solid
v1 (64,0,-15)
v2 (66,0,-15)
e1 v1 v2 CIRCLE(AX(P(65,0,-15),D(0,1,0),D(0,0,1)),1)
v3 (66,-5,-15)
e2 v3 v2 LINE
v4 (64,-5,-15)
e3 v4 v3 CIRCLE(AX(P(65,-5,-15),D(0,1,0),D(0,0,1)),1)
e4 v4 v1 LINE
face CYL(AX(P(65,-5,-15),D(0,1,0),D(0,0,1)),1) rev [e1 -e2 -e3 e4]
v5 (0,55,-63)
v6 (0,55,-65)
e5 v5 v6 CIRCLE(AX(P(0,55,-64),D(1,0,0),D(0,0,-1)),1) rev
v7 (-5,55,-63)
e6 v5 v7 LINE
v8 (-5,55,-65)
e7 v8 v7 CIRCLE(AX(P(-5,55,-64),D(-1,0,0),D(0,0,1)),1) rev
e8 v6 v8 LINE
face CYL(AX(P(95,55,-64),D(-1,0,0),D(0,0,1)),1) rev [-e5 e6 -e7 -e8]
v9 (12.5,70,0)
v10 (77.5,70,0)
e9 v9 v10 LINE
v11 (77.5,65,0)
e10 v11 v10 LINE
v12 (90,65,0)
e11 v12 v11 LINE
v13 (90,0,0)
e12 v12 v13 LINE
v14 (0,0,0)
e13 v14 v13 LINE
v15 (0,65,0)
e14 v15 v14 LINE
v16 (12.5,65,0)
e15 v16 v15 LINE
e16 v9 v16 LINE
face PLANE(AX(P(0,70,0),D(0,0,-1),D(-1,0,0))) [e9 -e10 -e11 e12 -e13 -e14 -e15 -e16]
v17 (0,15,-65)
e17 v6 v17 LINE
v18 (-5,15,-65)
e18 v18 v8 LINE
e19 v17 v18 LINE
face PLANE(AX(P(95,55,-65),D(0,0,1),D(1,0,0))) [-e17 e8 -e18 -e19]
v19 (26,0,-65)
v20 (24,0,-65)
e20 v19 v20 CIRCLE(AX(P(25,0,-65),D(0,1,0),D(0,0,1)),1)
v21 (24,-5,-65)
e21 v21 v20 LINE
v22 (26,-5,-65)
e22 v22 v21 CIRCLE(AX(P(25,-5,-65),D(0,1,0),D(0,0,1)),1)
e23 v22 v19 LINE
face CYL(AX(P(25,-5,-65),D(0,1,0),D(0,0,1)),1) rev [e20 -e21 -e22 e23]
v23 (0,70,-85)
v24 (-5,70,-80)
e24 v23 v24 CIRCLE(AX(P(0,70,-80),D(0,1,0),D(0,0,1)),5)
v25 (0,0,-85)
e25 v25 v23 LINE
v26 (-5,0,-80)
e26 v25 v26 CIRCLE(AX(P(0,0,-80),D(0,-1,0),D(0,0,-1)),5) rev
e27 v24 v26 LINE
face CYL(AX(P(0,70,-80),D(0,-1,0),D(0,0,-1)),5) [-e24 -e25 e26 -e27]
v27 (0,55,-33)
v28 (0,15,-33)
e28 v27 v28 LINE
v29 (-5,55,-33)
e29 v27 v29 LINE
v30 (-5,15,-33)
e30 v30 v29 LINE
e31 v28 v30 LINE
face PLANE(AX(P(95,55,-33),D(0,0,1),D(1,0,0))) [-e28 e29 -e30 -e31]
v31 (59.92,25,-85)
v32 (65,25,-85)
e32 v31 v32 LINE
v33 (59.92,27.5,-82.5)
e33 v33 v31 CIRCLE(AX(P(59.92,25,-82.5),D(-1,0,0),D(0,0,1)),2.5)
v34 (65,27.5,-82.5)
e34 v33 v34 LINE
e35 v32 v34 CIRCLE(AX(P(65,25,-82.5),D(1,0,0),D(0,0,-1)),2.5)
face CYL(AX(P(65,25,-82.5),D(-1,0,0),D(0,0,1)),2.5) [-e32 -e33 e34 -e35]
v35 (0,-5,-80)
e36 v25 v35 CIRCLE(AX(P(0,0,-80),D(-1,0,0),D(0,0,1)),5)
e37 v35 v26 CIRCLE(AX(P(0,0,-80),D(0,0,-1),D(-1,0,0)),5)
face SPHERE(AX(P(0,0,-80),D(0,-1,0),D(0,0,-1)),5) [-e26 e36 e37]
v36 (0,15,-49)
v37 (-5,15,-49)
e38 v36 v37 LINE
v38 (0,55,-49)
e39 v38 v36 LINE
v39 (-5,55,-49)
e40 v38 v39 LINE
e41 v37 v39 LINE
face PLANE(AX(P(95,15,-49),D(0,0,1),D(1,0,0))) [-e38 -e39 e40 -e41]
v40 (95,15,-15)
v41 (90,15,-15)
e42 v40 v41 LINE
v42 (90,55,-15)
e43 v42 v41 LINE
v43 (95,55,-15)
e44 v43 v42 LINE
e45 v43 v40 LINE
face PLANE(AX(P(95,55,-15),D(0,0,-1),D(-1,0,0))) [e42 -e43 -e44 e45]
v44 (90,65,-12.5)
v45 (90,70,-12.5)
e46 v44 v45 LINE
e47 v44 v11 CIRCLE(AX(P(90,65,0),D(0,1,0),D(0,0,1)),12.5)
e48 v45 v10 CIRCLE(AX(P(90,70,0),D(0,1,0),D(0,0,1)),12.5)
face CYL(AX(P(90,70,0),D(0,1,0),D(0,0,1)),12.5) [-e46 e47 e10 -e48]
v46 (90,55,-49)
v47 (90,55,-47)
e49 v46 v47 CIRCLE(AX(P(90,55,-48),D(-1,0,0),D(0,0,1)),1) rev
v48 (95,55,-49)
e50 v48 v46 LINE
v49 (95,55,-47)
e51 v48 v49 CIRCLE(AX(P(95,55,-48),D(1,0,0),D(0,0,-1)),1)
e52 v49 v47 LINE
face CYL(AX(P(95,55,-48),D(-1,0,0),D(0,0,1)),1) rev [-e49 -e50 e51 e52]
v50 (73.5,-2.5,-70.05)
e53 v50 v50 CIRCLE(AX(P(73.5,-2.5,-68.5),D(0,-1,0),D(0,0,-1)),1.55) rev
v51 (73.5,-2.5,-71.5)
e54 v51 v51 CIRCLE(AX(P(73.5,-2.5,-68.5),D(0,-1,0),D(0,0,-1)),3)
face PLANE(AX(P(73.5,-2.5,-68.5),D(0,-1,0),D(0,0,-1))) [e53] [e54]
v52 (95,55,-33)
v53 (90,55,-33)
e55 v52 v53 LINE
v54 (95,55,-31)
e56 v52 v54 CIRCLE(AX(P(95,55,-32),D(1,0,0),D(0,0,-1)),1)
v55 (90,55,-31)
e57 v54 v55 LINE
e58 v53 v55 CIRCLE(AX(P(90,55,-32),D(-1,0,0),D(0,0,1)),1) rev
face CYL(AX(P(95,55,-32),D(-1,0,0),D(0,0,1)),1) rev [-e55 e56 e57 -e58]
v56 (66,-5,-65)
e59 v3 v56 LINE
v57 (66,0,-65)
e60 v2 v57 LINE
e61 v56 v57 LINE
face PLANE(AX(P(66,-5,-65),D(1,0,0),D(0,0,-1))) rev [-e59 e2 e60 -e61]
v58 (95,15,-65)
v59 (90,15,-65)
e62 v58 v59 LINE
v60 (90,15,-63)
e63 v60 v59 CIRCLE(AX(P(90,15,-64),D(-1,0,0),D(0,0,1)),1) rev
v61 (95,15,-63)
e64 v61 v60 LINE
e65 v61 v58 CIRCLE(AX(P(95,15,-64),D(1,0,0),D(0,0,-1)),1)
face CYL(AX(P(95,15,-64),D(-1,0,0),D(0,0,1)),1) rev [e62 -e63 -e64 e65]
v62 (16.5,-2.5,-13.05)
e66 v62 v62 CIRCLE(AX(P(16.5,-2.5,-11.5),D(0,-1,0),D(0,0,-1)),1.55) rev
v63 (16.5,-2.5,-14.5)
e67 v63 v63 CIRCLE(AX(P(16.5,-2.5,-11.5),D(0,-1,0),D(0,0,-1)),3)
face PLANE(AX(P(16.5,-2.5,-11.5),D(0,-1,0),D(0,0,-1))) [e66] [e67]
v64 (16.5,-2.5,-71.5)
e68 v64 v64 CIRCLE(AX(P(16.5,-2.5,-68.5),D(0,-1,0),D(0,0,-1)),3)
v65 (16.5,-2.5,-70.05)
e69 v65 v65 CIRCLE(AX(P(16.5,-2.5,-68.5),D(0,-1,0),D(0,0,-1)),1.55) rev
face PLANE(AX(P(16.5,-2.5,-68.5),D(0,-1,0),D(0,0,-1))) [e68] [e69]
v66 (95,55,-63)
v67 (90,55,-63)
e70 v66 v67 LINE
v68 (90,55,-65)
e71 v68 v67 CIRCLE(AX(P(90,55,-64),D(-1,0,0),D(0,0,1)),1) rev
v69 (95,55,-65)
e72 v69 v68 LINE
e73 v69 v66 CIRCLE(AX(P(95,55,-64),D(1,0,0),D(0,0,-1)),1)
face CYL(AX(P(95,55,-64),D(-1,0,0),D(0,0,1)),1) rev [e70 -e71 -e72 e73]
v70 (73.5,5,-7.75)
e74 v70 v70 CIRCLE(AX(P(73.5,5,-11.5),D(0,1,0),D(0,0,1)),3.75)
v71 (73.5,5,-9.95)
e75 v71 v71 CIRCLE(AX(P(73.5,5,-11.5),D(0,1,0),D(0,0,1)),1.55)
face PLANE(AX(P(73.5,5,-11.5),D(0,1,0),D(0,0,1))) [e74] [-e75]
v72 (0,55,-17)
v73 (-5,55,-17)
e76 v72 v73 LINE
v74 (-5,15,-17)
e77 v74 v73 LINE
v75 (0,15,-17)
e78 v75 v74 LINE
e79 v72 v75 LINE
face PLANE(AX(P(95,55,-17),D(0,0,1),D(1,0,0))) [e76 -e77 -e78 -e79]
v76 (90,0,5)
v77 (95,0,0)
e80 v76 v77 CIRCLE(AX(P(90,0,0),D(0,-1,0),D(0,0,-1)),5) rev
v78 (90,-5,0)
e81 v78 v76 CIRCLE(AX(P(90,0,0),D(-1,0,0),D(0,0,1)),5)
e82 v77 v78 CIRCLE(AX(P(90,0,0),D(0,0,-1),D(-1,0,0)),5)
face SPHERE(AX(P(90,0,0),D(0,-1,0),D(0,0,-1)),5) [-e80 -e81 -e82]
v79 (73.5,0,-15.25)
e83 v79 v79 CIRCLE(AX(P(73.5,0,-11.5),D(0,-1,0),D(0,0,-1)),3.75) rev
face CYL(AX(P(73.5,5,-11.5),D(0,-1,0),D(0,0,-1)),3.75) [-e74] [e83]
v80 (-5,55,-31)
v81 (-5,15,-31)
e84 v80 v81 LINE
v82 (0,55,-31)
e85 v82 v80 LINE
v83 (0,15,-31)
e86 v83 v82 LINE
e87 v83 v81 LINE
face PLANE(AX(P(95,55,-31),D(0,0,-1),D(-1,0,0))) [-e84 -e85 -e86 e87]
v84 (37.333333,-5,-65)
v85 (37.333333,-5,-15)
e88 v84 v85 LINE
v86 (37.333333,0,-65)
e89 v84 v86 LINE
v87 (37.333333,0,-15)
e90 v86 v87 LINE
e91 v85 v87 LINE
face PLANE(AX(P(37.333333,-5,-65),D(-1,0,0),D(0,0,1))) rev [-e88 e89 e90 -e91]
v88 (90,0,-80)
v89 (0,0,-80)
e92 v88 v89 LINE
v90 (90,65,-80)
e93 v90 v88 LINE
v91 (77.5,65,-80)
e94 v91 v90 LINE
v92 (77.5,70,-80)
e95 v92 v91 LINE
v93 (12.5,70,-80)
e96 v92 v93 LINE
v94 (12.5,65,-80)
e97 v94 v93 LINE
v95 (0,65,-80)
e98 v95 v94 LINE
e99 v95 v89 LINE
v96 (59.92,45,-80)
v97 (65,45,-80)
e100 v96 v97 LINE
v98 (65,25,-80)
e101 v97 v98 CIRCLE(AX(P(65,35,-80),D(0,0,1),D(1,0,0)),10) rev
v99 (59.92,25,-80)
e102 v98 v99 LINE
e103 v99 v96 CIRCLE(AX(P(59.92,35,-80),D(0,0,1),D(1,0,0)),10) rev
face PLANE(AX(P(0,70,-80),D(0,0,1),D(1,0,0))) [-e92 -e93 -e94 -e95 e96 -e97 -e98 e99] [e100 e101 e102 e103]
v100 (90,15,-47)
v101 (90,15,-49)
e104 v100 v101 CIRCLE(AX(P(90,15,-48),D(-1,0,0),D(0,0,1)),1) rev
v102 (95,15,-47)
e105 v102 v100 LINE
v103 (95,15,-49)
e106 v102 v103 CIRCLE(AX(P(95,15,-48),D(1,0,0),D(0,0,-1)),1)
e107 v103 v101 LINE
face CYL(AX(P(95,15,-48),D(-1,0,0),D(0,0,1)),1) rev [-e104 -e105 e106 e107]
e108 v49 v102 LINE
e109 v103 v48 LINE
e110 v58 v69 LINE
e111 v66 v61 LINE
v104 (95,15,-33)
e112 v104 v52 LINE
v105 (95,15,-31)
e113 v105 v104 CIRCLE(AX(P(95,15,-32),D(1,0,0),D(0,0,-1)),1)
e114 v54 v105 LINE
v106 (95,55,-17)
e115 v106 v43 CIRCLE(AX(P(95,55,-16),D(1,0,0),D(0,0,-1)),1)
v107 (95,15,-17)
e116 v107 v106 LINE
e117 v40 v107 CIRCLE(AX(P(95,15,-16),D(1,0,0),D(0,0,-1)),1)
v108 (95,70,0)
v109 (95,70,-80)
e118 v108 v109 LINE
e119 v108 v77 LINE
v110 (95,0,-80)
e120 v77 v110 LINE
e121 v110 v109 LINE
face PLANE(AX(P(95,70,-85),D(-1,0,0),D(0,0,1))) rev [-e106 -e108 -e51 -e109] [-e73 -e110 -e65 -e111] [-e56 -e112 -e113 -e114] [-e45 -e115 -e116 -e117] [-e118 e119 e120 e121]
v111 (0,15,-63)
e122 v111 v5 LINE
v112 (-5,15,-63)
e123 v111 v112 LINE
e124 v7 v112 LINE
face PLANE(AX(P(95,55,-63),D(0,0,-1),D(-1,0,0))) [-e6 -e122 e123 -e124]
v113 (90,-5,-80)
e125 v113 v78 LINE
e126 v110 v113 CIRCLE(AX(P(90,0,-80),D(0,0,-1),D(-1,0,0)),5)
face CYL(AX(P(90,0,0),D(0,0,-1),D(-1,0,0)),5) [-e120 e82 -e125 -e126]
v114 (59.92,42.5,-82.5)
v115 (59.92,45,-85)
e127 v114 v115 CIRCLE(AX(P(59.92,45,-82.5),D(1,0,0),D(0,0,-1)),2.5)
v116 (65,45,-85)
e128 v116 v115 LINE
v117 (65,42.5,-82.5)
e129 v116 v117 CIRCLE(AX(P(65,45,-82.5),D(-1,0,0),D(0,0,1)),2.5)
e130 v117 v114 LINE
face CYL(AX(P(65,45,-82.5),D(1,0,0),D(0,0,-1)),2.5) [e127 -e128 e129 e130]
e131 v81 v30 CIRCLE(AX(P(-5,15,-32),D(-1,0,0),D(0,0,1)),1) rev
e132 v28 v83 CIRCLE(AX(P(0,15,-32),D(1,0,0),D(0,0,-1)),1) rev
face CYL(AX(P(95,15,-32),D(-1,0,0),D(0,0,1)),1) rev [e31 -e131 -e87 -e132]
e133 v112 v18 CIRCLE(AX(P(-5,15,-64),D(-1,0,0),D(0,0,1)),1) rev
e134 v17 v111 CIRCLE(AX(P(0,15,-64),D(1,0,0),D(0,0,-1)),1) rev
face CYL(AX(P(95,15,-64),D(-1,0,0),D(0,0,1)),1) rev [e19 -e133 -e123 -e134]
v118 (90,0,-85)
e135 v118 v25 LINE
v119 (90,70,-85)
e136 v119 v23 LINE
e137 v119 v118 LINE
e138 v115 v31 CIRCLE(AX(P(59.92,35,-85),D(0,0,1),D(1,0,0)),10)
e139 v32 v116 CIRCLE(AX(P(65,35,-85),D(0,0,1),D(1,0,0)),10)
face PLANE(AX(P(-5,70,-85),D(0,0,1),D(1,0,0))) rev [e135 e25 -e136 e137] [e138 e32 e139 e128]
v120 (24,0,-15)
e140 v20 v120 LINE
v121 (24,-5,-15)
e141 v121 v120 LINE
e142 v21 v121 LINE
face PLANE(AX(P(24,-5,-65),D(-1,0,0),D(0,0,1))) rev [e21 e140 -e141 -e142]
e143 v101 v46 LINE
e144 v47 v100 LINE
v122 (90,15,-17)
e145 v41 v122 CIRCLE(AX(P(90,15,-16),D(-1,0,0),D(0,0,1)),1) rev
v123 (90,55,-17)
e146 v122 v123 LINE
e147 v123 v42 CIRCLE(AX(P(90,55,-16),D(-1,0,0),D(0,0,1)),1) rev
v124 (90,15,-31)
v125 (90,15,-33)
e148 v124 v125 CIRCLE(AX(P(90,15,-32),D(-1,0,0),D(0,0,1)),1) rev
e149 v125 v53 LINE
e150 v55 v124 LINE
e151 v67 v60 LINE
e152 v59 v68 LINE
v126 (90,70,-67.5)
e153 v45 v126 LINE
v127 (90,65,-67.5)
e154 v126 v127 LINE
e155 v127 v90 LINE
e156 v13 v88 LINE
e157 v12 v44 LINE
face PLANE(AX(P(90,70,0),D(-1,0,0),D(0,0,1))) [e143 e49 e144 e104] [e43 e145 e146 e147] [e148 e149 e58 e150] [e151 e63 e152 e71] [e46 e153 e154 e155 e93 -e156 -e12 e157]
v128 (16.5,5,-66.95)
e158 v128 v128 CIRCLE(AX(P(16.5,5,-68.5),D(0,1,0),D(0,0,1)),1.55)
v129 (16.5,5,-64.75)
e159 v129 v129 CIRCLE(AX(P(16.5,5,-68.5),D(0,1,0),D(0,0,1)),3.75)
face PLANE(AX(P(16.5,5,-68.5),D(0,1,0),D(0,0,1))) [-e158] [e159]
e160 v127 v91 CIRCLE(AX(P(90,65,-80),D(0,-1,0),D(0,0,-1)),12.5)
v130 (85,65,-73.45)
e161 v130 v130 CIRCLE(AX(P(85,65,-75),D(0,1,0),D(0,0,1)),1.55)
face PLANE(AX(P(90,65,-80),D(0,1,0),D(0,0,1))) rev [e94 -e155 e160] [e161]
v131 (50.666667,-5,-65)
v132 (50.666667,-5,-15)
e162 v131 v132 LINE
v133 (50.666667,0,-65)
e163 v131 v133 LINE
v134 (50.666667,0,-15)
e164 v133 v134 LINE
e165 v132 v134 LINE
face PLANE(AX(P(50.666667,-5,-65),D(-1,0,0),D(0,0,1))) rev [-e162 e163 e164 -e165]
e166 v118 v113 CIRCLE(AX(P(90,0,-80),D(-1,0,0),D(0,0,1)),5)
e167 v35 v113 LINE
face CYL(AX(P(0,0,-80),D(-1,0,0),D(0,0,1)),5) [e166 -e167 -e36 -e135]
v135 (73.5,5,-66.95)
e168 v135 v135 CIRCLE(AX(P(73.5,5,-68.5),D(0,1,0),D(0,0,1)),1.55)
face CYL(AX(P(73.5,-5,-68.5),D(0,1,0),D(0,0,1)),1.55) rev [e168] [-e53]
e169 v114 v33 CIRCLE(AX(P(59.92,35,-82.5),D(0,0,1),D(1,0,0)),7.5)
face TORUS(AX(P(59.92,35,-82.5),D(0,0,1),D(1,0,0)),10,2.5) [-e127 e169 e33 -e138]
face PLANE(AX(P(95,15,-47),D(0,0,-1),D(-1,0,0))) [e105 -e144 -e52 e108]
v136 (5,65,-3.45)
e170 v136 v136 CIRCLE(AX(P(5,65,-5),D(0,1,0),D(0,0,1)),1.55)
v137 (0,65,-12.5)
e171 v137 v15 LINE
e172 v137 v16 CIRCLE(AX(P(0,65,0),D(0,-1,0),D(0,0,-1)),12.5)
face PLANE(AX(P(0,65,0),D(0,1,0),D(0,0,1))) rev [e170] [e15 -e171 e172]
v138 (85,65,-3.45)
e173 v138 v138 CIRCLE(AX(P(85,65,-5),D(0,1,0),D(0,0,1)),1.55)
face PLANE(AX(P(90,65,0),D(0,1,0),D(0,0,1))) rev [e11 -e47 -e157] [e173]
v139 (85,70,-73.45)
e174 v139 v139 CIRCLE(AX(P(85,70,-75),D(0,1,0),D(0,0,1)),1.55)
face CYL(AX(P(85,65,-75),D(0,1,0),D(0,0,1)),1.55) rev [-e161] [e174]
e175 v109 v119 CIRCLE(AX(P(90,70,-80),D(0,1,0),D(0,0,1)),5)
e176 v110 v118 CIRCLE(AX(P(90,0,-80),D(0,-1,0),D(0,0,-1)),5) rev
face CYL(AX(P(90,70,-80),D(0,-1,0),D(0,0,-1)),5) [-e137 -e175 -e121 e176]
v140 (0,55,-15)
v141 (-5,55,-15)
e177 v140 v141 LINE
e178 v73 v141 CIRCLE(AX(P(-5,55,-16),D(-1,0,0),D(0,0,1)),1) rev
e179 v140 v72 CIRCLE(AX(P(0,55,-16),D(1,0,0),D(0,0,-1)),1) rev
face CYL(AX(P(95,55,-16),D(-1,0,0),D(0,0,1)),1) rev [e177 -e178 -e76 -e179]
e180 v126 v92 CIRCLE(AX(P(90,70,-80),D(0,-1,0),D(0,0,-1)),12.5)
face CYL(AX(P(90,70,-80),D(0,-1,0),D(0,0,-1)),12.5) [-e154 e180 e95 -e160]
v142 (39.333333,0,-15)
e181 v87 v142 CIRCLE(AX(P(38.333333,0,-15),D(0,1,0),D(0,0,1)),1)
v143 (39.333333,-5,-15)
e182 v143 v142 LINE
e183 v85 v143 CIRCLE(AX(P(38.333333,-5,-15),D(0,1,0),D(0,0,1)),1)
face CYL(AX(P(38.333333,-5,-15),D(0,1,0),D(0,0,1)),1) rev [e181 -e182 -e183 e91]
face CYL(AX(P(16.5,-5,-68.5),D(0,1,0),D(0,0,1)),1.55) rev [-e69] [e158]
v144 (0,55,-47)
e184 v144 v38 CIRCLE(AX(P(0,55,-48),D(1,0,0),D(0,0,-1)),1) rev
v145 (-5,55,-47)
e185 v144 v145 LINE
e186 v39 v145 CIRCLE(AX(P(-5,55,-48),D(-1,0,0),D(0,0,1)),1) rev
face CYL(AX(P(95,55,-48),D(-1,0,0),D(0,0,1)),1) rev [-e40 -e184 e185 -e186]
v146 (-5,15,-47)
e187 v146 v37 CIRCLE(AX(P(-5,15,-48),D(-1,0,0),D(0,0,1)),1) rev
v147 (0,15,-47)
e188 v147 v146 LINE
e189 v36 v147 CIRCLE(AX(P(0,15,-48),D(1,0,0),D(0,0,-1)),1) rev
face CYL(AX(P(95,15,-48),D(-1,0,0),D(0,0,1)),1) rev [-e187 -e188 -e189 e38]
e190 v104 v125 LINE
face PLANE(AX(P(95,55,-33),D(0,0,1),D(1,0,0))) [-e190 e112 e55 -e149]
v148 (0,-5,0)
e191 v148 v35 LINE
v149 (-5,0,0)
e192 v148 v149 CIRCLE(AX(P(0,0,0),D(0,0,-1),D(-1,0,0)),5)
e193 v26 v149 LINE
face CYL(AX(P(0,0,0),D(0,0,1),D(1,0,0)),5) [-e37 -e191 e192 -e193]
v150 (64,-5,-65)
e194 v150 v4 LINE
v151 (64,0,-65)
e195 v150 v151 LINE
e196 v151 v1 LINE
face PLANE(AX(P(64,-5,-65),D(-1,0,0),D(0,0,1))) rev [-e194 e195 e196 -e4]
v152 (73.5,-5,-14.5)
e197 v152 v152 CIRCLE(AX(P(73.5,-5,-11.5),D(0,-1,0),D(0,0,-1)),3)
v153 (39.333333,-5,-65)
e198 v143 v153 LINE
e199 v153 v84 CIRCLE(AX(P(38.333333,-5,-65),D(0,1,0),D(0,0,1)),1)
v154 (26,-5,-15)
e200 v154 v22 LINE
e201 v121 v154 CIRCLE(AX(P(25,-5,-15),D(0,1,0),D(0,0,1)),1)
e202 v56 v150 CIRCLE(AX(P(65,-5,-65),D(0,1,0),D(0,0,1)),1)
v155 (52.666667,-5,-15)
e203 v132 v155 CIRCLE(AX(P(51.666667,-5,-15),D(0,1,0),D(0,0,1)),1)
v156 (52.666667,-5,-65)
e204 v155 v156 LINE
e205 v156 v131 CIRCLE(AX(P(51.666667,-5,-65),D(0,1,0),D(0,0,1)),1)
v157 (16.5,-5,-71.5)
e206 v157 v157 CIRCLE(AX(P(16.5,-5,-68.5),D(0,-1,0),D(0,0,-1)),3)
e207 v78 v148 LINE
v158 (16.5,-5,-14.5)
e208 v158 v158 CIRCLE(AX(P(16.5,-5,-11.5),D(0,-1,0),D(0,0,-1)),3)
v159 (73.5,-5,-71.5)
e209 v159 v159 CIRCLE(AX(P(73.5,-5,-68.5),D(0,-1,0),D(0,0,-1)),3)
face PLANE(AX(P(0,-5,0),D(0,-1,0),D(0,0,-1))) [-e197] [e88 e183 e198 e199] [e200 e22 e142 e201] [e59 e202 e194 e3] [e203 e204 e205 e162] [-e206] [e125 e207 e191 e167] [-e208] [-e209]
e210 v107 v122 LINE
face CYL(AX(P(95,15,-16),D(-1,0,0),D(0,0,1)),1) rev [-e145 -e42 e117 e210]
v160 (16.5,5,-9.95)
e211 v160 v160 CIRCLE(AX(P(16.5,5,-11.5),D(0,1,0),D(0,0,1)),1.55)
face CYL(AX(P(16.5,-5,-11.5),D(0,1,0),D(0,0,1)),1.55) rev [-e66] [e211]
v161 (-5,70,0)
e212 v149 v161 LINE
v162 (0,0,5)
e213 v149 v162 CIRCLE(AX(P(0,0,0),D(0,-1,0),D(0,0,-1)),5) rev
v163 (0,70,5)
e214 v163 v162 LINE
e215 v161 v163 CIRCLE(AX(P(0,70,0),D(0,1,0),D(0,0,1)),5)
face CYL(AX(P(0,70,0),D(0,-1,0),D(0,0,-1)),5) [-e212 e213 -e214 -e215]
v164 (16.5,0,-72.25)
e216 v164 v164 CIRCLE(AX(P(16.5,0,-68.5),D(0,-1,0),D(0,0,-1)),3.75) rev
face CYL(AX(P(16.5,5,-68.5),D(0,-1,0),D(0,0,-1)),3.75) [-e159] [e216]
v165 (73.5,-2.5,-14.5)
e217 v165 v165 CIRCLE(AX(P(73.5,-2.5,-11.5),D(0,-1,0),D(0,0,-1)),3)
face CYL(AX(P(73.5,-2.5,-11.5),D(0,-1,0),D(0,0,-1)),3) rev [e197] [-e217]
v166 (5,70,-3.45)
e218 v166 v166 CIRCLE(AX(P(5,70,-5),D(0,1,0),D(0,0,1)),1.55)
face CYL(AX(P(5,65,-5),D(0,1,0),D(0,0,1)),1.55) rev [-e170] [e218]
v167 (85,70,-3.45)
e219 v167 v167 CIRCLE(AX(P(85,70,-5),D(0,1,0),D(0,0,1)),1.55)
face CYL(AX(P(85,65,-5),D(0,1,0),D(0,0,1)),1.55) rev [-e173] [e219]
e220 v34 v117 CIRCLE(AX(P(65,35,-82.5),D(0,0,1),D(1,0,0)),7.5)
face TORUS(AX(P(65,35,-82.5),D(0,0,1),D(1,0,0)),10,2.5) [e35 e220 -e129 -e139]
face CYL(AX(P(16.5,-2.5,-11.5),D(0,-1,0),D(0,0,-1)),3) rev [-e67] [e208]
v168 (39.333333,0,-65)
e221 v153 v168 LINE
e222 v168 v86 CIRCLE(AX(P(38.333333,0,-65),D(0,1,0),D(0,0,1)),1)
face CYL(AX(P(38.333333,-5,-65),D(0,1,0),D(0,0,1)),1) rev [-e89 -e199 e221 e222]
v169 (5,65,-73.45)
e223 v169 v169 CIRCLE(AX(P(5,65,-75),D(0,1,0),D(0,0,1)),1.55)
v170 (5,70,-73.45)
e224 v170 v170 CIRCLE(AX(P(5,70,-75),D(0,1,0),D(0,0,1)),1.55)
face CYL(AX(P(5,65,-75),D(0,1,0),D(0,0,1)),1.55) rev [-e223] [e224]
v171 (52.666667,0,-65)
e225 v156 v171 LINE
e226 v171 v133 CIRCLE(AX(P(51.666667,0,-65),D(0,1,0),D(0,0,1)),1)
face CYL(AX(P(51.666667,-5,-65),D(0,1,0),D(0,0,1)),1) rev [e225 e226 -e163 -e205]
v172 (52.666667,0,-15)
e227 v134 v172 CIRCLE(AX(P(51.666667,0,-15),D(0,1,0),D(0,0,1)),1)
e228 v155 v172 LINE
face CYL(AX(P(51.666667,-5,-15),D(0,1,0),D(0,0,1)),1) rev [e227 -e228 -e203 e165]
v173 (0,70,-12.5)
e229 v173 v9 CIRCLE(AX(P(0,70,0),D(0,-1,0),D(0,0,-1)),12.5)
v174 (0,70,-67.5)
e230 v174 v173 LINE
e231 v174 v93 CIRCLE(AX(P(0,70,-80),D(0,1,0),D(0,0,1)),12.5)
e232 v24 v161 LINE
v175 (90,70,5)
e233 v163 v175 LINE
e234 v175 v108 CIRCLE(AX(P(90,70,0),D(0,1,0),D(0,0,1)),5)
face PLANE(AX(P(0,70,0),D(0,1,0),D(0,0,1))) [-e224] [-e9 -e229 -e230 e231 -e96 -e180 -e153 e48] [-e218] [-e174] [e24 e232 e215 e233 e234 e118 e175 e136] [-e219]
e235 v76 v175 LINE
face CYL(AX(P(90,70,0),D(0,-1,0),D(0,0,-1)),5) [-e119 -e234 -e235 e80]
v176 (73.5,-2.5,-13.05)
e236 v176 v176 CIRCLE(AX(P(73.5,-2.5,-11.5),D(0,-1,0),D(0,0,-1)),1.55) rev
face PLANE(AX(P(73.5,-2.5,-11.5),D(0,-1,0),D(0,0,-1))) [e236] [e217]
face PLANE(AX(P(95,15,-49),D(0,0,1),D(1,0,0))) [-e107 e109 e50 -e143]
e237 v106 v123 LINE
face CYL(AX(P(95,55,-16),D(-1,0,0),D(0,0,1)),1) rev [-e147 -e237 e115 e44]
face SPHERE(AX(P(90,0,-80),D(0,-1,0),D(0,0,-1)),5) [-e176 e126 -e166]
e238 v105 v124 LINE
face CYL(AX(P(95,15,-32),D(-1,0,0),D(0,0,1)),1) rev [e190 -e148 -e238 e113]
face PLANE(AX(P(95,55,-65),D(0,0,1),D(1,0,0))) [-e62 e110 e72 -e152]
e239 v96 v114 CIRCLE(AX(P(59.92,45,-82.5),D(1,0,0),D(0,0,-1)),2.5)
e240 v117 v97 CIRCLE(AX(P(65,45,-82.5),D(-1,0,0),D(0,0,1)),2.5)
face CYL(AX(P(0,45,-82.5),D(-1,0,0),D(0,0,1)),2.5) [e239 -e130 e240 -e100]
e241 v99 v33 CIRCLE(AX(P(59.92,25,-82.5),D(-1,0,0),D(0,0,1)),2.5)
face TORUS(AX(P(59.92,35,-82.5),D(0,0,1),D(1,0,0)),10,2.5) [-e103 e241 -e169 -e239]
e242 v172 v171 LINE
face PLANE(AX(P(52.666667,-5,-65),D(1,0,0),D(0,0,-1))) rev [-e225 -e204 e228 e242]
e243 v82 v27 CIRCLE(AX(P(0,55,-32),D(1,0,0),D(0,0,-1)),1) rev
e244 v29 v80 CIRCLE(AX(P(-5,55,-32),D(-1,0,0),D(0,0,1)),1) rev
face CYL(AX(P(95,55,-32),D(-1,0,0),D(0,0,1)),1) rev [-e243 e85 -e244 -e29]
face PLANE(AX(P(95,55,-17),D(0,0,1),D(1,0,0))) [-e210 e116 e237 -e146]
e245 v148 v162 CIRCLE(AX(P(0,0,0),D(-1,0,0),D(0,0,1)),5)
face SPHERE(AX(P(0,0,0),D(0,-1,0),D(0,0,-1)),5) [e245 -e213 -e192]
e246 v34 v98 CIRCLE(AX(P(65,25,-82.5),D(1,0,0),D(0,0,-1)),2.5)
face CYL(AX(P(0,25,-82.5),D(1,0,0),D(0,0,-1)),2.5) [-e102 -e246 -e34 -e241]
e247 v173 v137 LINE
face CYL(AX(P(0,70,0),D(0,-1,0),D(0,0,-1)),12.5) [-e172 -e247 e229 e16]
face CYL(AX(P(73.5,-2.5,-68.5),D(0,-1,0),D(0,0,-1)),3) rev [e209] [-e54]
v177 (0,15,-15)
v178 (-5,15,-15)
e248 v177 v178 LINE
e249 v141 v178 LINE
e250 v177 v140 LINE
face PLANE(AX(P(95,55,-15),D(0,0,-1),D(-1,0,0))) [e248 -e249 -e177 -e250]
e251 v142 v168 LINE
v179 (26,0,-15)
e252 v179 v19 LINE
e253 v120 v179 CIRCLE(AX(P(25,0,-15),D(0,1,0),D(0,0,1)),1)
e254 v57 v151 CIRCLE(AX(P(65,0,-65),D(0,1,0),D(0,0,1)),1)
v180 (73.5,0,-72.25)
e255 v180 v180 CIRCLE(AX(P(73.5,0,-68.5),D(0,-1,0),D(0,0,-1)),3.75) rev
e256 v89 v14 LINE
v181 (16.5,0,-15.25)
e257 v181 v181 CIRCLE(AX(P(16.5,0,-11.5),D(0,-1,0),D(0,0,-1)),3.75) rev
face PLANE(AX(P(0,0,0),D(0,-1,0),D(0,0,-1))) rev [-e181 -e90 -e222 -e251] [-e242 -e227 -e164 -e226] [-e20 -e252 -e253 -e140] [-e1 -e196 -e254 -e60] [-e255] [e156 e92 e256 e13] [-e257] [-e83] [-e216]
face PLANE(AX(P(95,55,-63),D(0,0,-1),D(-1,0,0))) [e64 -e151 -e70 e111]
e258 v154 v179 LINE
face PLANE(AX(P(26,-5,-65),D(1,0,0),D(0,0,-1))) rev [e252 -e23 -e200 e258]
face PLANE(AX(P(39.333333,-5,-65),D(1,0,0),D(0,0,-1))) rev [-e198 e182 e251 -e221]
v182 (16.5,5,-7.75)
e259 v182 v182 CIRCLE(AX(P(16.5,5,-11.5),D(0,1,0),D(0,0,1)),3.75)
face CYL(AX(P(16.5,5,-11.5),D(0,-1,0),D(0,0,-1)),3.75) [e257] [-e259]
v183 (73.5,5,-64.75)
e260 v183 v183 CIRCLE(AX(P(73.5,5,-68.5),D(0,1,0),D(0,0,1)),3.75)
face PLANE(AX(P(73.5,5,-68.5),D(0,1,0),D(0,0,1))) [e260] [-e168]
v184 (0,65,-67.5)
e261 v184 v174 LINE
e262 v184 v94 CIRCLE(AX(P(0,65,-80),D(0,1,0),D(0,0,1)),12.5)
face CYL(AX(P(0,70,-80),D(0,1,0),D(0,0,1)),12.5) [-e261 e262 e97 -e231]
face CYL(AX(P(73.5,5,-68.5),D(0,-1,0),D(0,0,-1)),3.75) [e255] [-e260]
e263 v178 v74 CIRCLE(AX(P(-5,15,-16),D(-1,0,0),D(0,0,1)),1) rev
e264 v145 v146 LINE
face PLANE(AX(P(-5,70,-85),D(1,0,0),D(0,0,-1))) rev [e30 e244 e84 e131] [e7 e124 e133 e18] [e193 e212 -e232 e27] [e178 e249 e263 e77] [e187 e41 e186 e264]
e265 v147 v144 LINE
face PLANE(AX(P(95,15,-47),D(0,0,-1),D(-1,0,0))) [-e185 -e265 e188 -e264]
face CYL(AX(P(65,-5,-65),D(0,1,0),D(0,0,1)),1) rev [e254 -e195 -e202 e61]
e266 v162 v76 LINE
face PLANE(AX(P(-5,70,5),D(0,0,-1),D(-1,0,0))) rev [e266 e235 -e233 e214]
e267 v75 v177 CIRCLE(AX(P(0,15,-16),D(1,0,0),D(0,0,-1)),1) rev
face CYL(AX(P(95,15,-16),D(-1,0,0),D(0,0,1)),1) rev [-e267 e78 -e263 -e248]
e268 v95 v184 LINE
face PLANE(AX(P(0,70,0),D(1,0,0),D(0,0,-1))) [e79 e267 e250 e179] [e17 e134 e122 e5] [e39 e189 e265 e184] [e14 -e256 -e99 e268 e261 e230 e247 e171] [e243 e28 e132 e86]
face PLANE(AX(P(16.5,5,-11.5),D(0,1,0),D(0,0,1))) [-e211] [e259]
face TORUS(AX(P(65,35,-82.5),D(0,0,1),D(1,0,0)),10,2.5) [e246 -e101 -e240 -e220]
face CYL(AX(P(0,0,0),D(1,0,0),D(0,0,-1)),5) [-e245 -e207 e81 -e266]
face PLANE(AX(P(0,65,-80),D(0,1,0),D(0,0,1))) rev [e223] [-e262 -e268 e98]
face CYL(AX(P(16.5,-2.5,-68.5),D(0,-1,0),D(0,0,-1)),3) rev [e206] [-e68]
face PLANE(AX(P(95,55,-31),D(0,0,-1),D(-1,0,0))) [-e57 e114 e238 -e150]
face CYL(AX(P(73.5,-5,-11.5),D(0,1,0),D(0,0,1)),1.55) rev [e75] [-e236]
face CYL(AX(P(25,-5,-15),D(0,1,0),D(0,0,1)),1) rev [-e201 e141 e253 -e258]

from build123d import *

# Parameters (mm, degrees)
SKETCH1_W                = 100
SKETCH1_H                = 90
SKETCH1_W_2              = 90
SKETCH1_H_2              = 80
BOSS_EXTRUDE1_DEPTH      = 70
SKETCH2_W                = 100
SKETCH2_H                = 90
BOSS_EXTRUDE2_DEPTH      = 5
FILLET1_R                = 5
SKETCH3_R                = 1.55
CUT_EXTRUDE1_DEPTH       = 146.430395722
SKETCH4_R                = 3
CUT_EXTRUDE2_DEPTH       = 2.5
CUT_EXTRUDE3_DEPTH       = 146.430395722
SKETCH6_W                = 12.5
SKETCH6_H                = 5
REVOLVE2_ANGLE           = 90
SKETCH7_W                = 12.5
SKETCH7_H                = 5
REVOLVE3_ANGLE           = 90
SKETCH8_W                = 12.5
SKETCH8_H                = 5
REVOLVE4_ANGLE           = 90
SKETCH9_W                = 12.5
SKETCH9_H                = 5
REVOLVE5_ANGLE           = 90
SKETCH10_R               = 1.55
CUT_EXTRUDE5_DEPTH       = 5
SKETCH13_R               = 3.75
BOSS_EXTRUDE3_DEPTH      = 5
SKETCH14_R               = 1.55
CUT_EXTRUDE7_DEPTH       = 146.430395722
FILLET3_R                = 5
CUT_EXTRUDE8_DEPTH       = 5
FILLET4_R                = 2.5
CUT_EXTRUDE11_DEPTH      = 149.744747806
CUT_EXTRUDE11_DEPTH_BACK = 149.744747806


with BuildPart() as part:
    # Sketch1 → Boss-Extrude1 (new body)
    with BuildSketch(Plane(origin=(0, 0, 0), x_dir=(1, 0, 0), z_dir=(0, 1, 0))):
        with Locations((45, 40)):
            Rectangle(SKETCH1_W, SKETCH1_H)
        with Locations((45, 40)):
            Rectangle(SKETCH1_W_2, SKETCH1_H_2, mode=Mode.SUBTRACT)
    extrude(amount=BOSS_EXTRUDE1_DEPTH)

    # Sketch2 → Boss-Extrude2 (add)
    with BuildSketch(Plane(origin=(0, 0, 0), x_dir=(-1, 0, 0), z_dir=(0, -1, 0))):
        with Locations((-45, 40)):
            Rectangle(SKETCH2_W, SKETCH2_H)
    extrude(amount=BOSS_EXTRUDE2_DEPTH)

    # Fillet1
    fillet1_edges = [part.edges().sort_by_distance(p)[0] for p in [
        (-5, 32.5, -85),
        (95, 32.5, -85),
        (95, 32.5, 5),
        (-5, 32.5, 5),
    ]]
    fillet(fillet1_edges, radius=FILLET1_R)

    # Sketch3 → Cut-Extrude1 (cut, through all)
    with BuildSketch(Plane(origin=(0, 0, 0), x_dir=(1, 0, 0), z_dir=(0, 1, 0))):
        with Locations(Location((16.5, 68.5, 0), (0, 0, 270))):
            Circle(SKETCH3_R)
        with Locations(Location((16.5, 11.5, 0), (0, 0, 270))):
            Circle(SKETCH3_R)
        with Locations(Location((73.5, 11.5, 0), (0, 0, 270))):
            Circle(SKETCH3_R)
        with Locations(Location((73.5, 68.5, 0), (0, 0, 270))):
            Circle(SKETCH3_R)
    extrude(amount=-CUT_EXTRUDE1_DEPTH, mode=Mode.SUBTRACT)

    # Sketch4 → Cut-Extrude2 (cut)
    with BuildSketch(Plane(origin=(0, -5, 0), x_dir=(-1, 0, 0), z_dir=(0, -1, 0))):
        with Locations(Location((-16.5, 11.5, 0), (0, 0, 90))):
            Circle(SKETCH4_R)
        with Locations(Location((-73.5, 11.5, 0), (0, 0, 90))):
            Circle(SKETCH4_R)
        with Locations(Location((-73.5, 68.5, 0), (0, 0, 90))):
            Circle(SKETCH4_R)
        with Locations(Location((-16.5, 68.5, 0), (0, 0, 90))):
            Circle(SKETCH4_R)
    extrude(amount=-CUT_EXTRUDE2_DEPTH, mode=Mode.SUBTRACT)

    # Sketch5 → Cut-Extrude3 (cut, through all)
    with BuildSketch(Plane(origin=(0, 0, 0), x_dir=(1, 0, 0), z_dir=(0, 1, 0))):
        with BuildLine():
            Line((26, 65), (26, 15))
            ThreePointArc((26, 15), (25, 14), (24, 15))
            Line((24, 15), (24, 65))
            ThreePointArc((24, 65), (25, 66), (26, 65))
        make_face()
        with BuildLine():
            Line((66, 65), (66, 15))
            ThreePointArc((66, 15), (65, 14), (64, 15))
            Line((64, 15), (64, 65))
            ThreePointArc((64, 65), (65, 66), (66, 65))
        make_face()
        with BuildLine():
            Line((52.666666667, 65), (52.666666667, 15))
            ThreePointArc((52.666666667, 15), (51.666666667, 14), (50.666666667, 15))
            Line((50.666666667, 15), (50.666666667, 65))
            ThreePointArc((50.666666667, 65), (51.666666667, 66), (52.666666667, 65))
        make_face()
        with BuildLine():
            Line((39.333333333, 65), (39.333333333, 15))
            ThreePointArc((39.333333333, 15), (38.333333333, 14), (37.333333333, 15))
            Line((37.333333333, 15), (37.333333333, 65))
            ThreePointArc((37.333333333, 65), (38.333333333, 66), (39.333333333, 65))
        make_face()
    extrude(amount=-CUT_EXTRUDE3_DEPTH, mode=Mode.SUBTRACT)

    # Sketch6 → Revolve2 (revolve)
    with BuildSketch(Plane.XY.offset(-80)):
        with Locations((6.25, 67.5)):
            Rectangle(SKETCH6_W, SKETCH6_H)
    revolve(axis=Axis((0, 70, -80), (0, -1, 0)), revolution_arc=REVOLVE2_ANGLE)

    # Sketch7 → Revolve3 (revolve)
    with BuildSketch(Plane.XY.offset(-80)):
        with Locations((83.75, 67.5)):
            Rectangle(SKETCH7_W, SKETCH7_H)
    revolve(axis=Axis((90, 70, -80), (0, 1, 0)), revolution_arc=REVOLVE3_ANGLE)

    # Sketch8 → Revolve4 (revolve)
    with BuildSketch(Plane(origin=(0, 0, 0), x_dir=(-1, 0, 0), z_dir=(0, 0, -1))):
        with Locations((-83.75, 67.5)):
            Rectangle(SKETCH8_W, SKETCH8_H)
    revolve(axis=Axis((90, 70, 0), (0, -1, 0)), revolution_arc=REVOLVE4_ANGLE)

    # Sketch9 → Revolve5 (revolve)
    with BuildSketch(Plane(origin=(0, 0, 0), x_dir=(-1, 0, 0), z_dir=(0, 0, -1))):
        with Locations((-6.25, 67.5)):
            Rectangle(SKETCH9_W, SKETCH9_H)
    revolve(axis=Axis((0, 70, 0), (0, 1, 0)), revolution_arc=REVOLVE5_ANGLE)

    # Sketch10 → Cut-Extrude5 (cut)
    with BuildSketch(Plane(origin=(0, 70, 0), x_dir=(1, 0, 0), z_dir=(0, 1, 0))):
        with Locations(Location((5, 75, 0), (0, 0, 270))):
            Circle(SKETCH10_R)
        with Locations(Location((85, 75, 0), (0, 0, 270))):
            Circle(SKETCH10_R)
        with Locations(Location((85, 5, 0), (0, 0, 270))):
            Circle(SKETCH10_R)
        with Locations(Location((5, 5, 0), (0, 0, 270))):
            Circle(SKETCH10_R)
    extrude(amount=-CUT_EXTRUDE5_DEPTH, mode=Mode.SUBTRACT)

    # Sketch13 → Boss-Extrude3 (add)
    with BuildSketch(Plane(origin=(0, 0, 0), x_dir=(1, 0, 0), z_dir=(0, 1, 0))):
        with Locations(Location((16.5, 68.5, 0), (0, 0, 90))):
            Circle(SKETCH13_R)
        with Locations(Location((73.5, 68.5, 0), (0, 0, 90))):
            Circle(SKETCH13_R)
        with Locations(Location((73.5, 11.5, 0), (0, 0, 90))):
            Circle(SKETCH13_R)
        with Locations(Location((16.5, 11.5, 0), (0, 0, 90))):
            Circle(SKETCH13_R)
    extrude(amount=BOSS_EXTRUDE3_DEPTH)

    # Sketch14 → Cut-Extrude7 (cut, through all)
    with BuildSketch(Plane(origin=(0, 0, 0), x_dir=(-1, 0, 0), z_dir=(0, -1, 0))):
        with Locations(Location((-73.5, 68.5, 0), (0, 0, 270))):
            Circle(SKETCH14_R)
        with Locations(Location((-73.5, 11.5, 0), (0, 0, 270))):
            Circle(SKETCH14_R)
        with Locations(Location((-16.5, 11.5, 0), (0, 0, 270))):
            Circle(SKETCH14_R)
        with Locations(Location((-16.5, 68.5, 0), (0, 0, 270))):
            Circle(SKETCH14_R)
    extrude(amount=-CUT_EXTRUDE7_DEPTH, mode=Mode.SUBTRACT)

    # Fillet3
    fillet3_edges = [part.edges().sort_by_distance(p)[0] for p in [
        (-5, -5, -40),
        (45, -5, -85),
        (95, -5, -40),
        (45, -5, 5),
        (-3.535533906, -5, 3.535533906),
        (93.535533906, -5, 3.535533906),
        (93.535533906, -5, -83.535533906),
        (-3.535533906, -5, -83.535533906),
    ]]
    fillet(fillet3_edges, radius=FILLET3_R)

    # Sketch15 → Cut-Extrude8 (cut)
    with BuildSketch(Plane(origin=(0, 0, -85), x_dir=(-1, 0, 0), z_dir=(0, 0, -1))):
        with BuildLine():
            Line((-65, 42.5), (-59.92, 42.5))
            ThreePointArc((-59.92, 42.5), (-52.42, 35), (-59.92, 27.5))
            Line((-59.92, 27.5), (-65, 27.5))
            ThreePointArc((-65, 27.5), (-72.5, 35), (-65, 42.5))
        make_face()
    extrude(amount=-CUT_EXTRUDE8_DEPTH, mode=Mode.SUBTRACT)

    # Fillet4
    fillet4_edges = [part.edges().sort_by_distance(p)[0] for p in [
        (62.46, 42.5, -85),
        (62.46, 27.5, -85),
        (62.46, 42.5, -80),
        (62.46, 27.5, -80),
        (52.42, 35, -85),
        (52.42, 35, -80),
        (72.5, 35, -85),
        (72.5, 35, -80),
    ]]
    fillet(fillet4_edges, radius=FILLET4_R - 0.0001)  # a hair under: the kernel refuses the full size

    # Sketch16 → Cut-Extrude11 (cut, two sides: drawn at the far end of the back side and taken through both)
    with BuildSketch(Plane(origin=(-5, 0, 0), x_dir=(0, 0, -1), z_dir=(1, 0, 0)).offset(-CUT_EXTRUDE11_DEPTH_BACK)):
        with BuildLine():
            Line((65, 55), (65, 15))
            ThreePointArc((65, 15), (64, 14), (63, 15))
            Line((63, 15), (63, 55))
            ThreePointArc((63, 55), (64, 56), (65, 55))
        make_face()
        with BuildLine():
            Line((47, 15), (47, 55))
            ThreePointArc((47, 55), (48, 56), (49, 55))
            Line((49, 55), (49, 15))
            ThreePointArc((49, 15), (48, 14), (47, 15))
        make_face()
        with BuildLine():
            Line((17, 55), (17, 15))
            ThreePointArc((17, 15), (16, 14), (15, 15))
            Line((15, 15), (15, 55))
            ThreePointArc((15, 55), (16, 56), (17, 55))
        make_face()
        with BuildLine():
            Line((33, 55), (33, 15))
            ThreePointArc((33, 15), (32, 14), (31, 15))
            Line((31, 15), (31, 55))
            ThreePointArc((31, 55), (32, 56), (33, 55))
        make_face()
    extrude(amount=CUT_EXTRUDE11_DEPTH + CUT_EXTRUDE11_DEPTH_BACK, mode=Mode.SUBTRACT)


solid = part.part
